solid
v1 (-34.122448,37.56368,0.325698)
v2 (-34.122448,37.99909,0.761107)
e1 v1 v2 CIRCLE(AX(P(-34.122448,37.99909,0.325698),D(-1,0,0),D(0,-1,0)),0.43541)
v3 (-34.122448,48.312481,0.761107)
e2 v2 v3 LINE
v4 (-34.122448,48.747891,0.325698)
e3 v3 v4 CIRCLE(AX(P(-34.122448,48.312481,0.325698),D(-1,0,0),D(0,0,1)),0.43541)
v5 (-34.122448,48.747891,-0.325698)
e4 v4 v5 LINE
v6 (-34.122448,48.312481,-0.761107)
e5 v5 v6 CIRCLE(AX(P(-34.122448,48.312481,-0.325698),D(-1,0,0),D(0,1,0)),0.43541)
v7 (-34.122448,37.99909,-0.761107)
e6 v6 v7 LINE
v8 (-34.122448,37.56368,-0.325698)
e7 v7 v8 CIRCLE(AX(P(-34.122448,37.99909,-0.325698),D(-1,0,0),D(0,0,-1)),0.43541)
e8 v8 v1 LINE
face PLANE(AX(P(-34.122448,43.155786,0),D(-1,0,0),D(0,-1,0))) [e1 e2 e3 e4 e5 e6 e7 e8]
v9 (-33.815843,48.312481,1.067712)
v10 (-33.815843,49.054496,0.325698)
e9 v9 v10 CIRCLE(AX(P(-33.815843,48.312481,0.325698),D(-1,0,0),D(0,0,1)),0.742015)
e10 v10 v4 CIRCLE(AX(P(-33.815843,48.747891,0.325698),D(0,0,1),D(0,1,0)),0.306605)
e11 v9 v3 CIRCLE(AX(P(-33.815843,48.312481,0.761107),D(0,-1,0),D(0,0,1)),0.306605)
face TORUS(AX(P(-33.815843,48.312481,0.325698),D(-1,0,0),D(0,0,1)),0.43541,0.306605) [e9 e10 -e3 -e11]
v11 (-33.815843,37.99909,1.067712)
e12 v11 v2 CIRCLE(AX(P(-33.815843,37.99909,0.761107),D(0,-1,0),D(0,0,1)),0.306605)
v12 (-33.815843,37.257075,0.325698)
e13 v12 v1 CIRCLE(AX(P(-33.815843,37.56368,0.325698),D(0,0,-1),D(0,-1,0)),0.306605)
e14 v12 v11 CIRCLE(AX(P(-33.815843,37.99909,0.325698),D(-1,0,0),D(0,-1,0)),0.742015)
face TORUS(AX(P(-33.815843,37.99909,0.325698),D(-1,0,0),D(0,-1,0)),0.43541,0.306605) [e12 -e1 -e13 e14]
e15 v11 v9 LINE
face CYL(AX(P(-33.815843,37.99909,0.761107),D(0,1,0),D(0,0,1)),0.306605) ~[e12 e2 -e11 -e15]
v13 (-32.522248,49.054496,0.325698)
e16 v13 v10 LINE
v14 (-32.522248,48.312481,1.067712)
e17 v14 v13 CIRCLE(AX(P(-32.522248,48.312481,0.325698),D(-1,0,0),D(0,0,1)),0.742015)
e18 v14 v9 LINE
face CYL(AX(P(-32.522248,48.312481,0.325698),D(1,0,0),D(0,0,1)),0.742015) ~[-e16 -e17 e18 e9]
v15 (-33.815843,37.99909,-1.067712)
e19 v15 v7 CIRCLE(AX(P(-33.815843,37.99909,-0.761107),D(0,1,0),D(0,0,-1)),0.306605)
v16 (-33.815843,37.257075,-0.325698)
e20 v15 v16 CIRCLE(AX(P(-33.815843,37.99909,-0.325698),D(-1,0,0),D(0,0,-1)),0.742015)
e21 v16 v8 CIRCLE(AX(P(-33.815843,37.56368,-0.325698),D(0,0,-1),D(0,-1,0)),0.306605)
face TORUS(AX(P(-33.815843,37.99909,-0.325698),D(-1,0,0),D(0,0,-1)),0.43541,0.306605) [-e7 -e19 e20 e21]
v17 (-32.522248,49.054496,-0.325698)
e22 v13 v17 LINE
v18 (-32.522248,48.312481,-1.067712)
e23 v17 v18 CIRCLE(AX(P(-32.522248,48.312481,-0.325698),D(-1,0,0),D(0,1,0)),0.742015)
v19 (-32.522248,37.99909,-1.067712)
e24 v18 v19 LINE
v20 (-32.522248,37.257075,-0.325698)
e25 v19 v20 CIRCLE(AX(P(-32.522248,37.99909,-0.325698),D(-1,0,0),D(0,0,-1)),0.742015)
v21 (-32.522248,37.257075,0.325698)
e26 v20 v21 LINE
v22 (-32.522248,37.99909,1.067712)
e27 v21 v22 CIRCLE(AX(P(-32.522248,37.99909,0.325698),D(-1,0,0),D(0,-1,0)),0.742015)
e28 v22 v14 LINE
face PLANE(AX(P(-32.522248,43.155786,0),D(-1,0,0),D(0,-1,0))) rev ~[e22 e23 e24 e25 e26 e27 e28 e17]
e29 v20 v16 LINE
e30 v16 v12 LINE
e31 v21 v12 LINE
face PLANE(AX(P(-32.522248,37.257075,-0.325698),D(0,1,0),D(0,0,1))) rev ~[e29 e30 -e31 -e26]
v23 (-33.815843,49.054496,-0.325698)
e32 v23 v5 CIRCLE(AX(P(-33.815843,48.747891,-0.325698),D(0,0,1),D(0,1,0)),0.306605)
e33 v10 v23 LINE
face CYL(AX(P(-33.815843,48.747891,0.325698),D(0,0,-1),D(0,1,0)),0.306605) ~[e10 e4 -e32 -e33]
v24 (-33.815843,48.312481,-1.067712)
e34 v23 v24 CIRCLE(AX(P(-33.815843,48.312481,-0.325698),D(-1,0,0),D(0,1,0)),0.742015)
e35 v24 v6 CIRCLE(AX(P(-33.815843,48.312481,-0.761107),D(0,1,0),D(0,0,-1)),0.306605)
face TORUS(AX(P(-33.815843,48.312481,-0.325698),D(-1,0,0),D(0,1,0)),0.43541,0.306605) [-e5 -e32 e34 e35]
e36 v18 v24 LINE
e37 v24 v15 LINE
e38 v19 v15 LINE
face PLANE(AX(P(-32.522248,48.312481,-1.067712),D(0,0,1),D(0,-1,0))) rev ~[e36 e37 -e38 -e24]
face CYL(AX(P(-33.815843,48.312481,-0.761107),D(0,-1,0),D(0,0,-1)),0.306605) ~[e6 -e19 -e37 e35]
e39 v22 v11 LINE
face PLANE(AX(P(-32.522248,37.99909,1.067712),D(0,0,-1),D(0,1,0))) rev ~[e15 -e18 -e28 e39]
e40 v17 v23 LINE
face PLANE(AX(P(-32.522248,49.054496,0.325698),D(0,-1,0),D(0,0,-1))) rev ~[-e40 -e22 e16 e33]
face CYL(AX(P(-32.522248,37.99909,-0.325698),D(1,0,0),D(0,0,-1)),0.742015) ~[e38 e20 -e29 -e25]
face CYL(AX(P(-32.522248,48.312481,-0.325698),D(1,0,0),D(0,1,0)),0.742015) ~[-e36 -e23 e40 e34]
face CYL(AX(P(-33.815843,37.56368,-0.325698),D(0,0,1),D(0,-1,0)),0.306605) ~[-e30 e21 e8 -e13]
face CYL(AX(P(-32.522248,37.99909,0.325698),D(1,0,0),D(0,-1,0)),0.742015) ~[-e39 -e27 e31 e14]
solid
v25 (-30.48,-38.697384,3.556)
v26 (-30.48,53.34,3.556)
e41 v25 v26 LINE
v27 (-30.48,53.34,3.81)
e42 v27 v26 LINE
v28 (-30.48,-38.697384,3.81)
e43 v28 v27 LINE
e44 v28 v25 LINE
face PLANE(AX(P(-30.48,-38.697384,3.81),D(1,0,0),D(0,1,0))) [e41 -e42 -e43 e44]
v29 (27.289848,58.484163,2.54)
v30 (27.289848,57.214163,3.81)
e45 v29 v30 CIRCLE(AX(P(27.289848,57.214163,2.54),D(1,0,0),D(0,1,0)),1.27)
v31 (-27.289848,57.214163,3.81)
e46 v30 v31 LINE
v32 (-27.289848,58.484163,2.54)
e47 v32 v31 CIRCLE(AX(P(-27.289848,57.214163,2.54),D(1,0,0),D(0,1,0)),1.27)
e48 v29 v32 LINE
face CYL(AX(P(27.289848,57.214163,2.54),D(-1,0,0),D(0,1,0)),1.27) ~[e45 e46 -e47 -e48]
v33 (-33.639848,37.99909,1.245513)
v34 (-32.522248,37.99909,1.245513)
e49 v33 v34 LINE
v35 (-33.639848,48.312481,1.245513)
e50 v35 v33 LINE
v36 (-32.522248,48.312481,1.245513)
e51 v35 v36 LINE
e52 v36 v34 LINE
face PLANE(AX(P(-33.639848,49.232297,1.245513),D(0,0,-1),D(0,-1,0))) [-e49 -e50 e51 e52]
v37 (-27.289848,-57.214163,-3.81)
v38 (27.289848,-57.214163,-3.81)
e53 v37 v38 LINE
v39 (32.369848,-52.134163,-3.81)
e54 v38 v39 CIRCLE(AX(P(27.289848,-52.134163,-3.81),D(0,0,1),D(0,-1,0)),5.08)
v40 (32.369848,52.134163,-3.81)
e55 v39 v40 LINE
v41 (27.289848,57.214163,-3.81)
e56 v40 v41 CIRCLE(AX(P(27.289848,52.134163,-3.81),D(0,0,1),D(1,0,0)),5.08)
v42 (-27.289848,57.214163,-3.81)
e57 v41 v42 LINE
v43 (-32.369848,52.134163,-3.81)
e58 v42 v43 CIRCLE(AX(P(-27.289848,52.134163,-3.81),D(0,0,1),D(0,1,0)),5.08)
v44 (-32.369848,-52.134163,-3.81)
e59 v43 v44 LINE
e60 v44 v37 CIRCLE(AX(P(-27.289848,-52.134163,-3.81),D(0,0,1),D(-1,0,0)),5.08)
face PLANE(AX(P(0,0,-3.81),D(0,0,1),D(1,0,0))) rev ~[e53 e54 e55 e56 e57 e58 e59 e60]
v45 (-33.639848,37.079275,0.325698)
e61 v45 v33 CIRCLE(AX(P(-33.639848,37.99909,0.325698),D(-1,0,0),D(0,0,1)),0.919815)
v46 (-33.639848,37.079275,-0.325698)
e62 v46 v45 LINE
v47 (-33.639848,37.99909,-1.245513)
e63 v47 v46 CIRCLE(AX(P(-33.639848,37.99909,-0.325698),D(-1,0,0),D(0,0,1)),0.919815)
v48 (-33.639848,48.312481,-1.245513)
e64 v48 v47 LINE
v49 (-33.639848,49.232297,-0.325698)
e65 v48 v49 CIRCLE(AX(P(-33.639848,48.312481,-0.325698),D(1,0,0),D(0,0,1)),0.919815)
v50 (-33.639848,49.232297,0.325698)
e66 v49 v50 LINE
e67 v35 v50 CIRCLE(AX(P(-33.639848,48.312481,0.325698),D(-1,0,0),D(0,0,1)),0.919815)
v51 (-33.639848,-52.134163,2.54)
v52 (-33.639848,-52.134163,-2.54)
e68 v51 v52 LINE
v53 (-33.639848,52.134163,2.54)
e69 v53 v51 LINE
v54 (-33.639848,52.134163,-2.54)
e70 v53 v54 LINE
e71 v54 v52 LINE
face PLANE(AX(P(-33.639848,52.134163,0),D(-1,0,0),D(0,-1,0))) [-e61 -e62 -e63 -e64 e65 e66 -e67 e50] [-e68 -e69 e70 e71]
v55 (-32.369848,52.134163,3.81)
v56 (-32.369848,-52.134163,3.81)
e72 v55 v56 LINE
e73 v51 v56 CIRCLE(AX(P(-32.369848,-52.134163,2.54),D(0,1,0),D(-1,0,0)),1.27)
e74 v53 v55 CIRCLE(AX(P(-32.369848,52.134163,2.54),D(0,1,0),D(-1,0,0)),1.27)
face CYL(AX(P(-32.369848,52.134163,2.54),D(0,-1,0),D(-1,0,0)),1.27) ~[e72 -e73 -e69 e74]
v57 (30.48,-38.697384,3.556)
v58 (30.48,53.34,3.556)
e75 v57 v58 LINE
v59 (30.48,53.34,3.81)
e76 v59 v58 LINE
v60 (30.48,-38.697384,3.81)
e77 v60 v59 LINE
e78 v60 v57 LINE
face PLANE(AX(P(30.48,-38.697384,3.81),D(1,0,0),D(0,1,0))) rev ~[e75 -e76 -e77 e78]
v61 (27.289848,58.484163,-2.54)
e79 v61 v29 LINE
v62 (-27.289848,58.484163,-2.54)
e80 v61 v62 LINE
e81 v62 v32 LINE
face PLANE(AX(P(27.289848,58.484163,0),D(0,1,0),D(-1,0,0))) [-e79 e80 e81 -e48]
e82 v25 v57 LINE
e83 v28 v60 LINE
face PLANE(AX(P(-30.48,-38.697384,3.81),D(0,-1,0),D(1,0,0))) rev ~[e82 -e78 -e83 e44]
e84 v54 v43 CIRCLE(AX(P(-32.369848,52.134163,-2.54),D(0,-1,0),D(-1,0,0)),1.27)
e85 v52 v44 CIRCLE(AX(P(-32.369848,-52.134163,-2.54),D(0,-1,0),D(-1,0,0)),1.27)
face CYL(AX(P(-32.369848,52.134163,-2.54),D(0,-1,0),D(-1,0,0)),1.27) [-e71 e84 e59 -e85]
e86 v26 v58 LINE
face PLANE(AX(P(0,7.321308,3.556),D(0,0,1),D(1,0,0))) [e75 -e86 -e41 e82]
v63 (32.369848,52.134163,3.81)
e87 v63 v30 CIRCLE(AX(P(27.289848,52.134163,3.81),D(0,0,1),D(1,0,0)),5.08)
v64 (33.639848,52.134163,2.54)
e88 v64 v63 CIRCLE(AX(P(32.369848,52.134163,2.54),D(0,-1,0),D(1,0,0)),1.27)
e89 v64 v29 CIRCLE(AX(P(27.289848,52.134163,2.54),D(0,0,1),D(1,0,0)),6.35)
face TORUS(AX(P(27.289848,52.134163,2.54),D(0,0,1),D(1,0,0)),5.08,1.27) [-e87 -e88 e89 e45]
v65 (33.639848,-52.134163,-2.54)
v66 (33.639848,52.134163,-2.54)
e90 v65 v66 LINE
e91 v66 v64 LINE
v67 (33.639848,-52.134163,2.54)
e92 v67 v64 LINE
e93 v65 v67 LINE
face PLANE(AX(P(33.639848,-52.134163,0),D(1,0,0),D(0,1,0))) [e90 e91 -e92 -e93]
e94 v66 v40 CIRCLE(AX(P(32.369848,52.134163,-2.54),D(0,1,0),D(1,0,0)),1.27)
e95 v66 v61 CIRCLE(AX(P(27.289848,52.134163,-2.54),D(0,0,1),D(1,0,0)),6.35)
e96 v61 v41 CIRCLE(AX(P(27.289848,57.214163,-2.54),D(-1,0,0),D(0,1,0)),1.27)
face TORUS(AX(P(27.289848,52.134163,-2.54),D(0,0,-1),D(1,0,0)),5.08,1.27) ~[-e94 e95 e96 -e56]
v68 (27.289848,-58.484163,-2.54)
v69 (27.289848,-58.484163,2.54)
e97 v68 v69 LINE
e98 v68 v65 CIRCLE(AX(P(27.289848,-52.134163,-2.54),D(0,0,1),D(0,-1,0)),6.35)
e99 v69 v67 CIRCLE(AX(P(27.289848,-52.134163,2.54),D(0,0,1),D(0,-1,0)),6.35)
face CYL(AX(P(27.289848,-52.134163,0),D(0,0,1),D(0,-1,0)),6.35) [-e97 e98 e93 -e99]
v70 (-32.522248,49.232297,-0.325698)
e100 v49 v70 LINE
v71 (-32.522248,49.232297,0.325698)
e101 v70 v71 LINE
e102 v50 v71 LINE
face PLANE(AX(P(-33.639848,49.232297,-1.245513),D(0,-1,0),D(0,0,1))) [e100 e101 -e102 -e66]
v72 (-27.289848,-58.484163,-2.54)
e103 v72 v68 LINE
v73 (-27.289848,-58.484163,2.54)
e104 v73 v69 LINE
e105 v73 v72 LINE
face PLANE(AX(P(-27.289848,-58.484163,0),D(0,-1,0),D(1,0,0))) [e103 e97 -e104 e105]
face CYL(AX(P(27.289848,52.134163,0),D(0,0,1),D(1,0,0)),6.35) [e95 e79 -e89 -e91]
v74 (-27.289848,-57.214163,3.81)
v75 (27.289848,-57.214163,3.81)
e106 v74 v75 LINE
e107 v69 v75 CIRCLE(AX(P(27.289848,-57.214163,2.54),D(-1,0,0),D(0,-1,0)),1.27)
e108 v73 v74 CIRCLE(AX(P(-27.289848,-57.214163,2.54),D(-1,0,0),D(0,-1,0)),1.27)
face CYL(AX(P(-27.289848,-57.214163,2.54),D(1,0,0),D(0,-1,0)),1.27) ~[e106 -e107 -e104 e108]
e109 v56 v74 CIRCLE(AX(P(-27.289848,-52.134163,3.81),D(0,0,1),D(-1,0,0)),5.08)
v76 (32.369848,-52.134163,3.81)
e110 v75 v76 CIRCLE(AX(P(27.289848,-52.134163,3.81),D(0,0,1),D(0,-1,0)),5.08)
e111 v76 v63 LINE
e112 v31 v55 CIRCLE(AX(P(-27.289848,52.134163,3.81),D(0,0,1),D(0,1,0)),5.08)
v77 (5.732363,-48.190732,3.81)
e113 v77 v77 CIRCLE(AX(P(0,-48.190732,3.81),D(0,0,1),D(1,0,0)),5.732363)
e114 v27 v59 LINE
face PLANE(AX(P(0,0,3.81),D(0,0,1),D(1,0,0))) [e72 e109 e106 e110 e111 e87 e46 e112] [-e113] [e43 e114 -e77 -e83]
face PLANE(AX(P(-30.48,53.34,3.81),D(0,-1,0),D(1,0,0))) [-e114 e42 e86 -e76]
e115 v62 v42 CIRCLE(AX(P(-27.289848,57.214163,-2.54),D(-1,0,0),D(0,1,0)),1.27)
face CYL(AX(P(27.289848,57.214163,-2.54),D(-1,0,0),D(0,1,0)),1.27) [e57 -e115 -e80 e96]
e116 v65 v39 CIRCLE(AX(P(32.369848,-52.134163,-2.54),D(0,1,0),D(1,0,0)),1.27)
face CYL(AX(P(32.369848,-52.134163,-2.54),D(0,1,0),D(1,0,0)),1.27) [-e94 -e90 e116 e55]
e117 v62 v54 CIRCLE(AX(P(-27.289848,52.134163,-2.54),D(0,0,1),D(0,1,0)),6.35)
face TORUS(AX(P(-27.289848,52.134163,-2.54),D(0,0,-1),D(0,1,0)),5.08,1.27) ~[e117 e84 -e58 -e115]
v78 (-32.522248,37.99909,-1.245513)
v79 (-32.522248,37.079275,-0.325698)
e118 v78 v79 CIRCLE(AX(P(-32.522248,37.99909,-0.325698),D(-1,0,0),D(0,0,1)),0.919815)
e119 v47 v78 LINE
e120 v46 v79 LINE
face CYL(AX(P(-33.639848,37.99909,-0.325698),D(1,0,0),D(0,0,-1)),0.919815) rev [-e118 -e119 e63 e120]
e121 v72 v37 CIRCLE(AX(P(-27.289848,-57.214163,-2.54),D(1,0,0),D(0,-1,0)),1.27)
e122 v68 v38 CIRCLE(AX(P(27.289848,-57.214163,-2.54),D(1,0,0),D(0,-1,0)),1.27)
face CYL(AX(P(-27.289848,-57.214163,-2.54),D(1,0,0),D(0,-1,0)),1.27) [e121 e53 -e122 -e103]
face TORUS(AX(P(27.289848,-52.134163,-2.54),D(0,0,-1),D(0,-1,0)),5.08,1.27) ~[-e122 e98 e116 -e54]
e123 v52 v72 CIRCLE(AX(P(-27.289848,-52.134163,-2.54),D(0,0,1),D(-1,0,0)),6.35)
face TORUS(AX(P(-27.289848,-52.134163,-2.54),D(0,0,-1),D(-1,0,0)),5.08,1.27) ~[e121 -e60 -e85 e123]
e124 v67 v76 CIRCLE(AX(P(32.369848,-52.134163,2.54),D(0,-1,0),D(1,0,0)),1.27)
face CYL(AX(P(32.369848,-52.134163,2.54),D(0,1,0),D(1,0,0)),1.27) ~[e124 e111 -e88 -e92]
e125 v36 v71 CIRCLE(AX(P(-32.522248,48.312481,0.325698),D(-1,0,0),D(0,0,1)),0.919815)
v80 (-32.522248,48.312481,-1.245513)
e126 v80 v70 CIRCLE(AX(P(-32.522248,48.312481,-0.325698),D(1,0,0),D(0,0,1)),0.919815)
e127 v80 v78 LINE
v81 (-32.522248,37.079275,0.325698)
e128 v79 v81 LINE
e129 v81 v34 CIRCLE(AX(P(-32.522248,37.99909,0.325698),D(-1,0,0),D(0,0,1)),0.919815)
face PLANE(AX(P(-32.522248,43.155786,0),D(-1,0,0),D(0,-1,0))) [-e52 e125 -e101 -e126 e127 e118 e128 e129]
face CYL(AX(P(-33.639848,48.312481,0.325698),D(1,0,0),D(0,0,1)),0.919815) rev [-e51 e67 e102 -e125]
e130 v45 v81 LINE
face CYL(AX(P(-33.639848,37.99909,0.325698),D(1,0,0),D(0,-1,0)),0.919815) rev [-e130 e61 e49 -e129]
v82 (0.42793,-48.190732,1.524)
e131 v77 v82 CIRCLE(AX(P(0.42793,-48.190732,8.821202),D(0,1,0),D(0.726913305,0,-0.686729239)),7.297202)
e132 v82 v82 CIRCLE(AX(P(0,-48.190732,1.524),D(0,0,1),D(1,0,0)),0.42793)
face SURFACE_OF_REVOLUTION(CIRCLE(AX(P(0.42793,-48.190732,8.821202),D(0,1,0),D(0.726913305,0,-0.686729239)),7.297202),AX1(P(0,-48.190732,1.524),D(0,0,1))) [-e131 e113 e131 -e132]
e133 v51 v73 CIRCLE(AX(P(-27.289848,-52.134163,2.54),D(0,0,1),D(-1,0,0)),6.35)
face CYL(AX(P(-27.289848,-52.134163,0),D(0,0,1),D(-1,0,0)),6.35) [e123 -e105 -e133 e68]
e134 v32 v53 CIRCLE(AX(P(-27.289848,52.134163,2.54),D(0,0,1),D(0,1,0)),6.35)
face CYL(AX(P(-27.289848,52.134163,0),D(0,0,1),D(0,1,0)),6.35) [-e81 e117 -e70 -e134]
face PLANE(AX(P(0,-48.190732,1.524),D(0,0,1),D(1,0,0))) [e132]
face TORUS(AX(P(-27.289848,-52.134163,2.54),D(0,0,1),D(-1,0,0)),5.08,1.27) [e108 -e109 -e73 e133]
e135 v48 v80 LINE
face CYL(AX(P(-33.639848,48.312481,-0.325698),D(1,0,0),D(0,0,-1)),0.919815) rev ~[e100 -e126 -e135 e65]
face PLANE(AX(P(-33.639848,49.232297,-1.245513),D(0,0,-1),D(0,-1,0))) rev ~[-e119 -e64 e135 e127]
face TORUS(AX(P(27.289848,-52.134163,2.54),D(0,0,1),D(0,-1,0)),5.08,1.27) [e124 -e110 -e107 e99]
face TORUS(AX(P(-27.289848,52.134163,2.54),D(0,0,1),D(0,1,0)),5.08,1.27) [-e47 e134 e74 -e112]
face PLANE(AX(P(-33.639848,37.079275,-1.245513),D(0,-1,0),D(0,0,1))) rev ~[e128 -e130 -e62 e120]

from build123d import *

# Parameters (mm, degrees)
F1_DEPTH  = 3.81
F2_R      = 1.27
F3_R      = 5.7323628205
F4_DEPTH  = 2.286
F3_W      = 60.96
F3_H      = 92.0373842978
F6_DEPTH  = 0.254
F7_W      = 12.1530219913
F7_H      = 2.4910259526
F8_DEPTH  = 1.1176
F9_R      = 0.9198153673
F11_DEPTH = 1.6002
F12_R     = 0.3066051224


# Not quite as in the source:
# - a fillet or chamfer that OpenCascade refuses, or shapes differently, is made with other operations: its cross-section is extruded or revolved along the edge and cut away or added


with BuildPart() as f1:
    # F0 (on Top) → F1 (new body, symmetric)
    with BuildSketch(Plane.XY):
        with BuildLine():
            Line((-27.2898482323, -58.4841631353), (27.2898482323, -58.4841631353))
            ThreePointArc((27.2898482323, -58.4841631353), (31.7799762928, -56.6242911958), (33.6398482323, -52.1341631353))
            Line((33.6398482323, -52.1341631353), (33.6398482323, 52.1341631353))
            ThreePointArc((33.6398482323, 52.1341631353), (31.7799762928, 56.6242911958), (27.2898482323, 58.4841631353))
            Line((27.2898482323, 58.4841631353), (-27.2898482323, 58.4841631353))
            ThreePointArc((-27.2898482323, 58.4841631353), (-31.7799762928, 56.6242911958), (-33.6398482323, 52.1341631353))
            Line((-33.6398482323, 52.1341631353), (-33.6398482323, -52.1341631353))
            ThreePointArc((-33.6398482323, -52.1341631353), (-31.7799762928, -56.6242911958), (-27.2898482323, -58.4841631353))
        make_face()
    extrude(amount=F1_DEPTH, both=True)

    # F2
    f2_edges = [f1.edges().sort_by_distance(p)[0] for p in [
        (33.639848, 0, 3.81),
        (33.639848, 0, -3.81),
        (-33.639848, 0, -3.81),
        (-33.639848, 0, 3.81),
        (-31.779976, 56.624291, -3.81),
        (-31.779976, 56.624291, 3.81),
        (0, 58.484163, -3.81),
        (0, 58.484163, 3.81),
        (31.779976, 56.624291, -3.81),
        (31.779976, 56.624291, 3.81),
        (31.779976, -56.624291, -3.81),
        (31.779976, -56.624291, 3.81),
        (0, -58.484163, -3.81),
        (0, -58.484163, 3.81),
        (-31.779976, -56.624291, 3.81),
        (-31.779976, -56.624291, -3.81),
    ]]
    fillet(f2_edges, radius=F2_R)

    # F3 (on face) → F4 (cut)
    with BuildSketch(Plane.XY.offset(3.81)):
        with Locations((0, -48.1907315552)):
            Circle(F3_R)
    extrude(amount=-F4_DEPTH, mode=Mode.SUBTRACT)

    # F5: fillet of radius 7.2972019136 on 1 edges, made by hand

    # F5_s1 → F5_t2 (revolve)
    with BuildSketch(Plane.XZ.offset(48.1907315552)):
        with BuildLine():
            ThreePointArc((5.7323628205, 3.81), (3.3159569781, 2.1198248924), (0.4279296605, 1.524))
            Line((0.4279296605, 1.524), (5.7323628205, 1.524))
            Line((5.7323628205, 1.524), (5.7323628205, 3.81))
        make_face()
    revolve(axis=Axis((0, -48.1907315552, 1.524), (0, 0, 1)))

    # F3 (on face) → F6 (cut)
    with BuildSketch(Plane.XY.offset(3.81)):
        with Locations((0, 7.3213078511)):
            Rectangle(F3_W, F3_H)
    extrude(amount=-F6_DEPTH, mode=Mode.SUBTRACT)

    # F7 (on face) → F8 (cut)
    with BuildSketch(Plane(origin=(-33.6398482323, 0, 0), x_dir=(0, -1, 0), z_dir=(-1, 0, 0))):
        with Locations((-43.15578565, 0)):
            Rectangle(F7_W, F7_H)
    extrude(amount=-F8_DEPTH, mode=Mode.SUBTRACT)

    # F9
    f9_edges = [f1.edges().sort_by_distance(p)[0] for p in [
        (-33.081048, 37.079275, 1.245513),
        (-33.081048, 49.232297, 1.245513),
        (-33.081048, 49.232297, -1.245513),
        (-33.081048, 37.079275, -1.245513),
    ]]
    fillet(f9_edges, radius=F9_R)


with BuildPart() as f11:
    # F10 (on face) → F11 (new body)
    with BuildSketch(Plane(origin=(-32.5222482323, 0, 0), x_dir=(0, -1, 0), z_dir=(-1, 0, 0))):
        with BuildLine():
            Line((-48.3124812784, -1.0677123209), (-37.9990900217, -1.0677123209))
            ThreePointArc((-37.9990900217, -1.0677123209), (-37.4744063871, -0.8503812436), (-37.2570753098, -0.325697609))
            Line((-37.2570753098, -0.325697609), (-37.2570753098, 0.325697609))
            ThreePointArc((-37.2570753098, 0.325697609), (-37.4744063871, 0.8503812436), (-37.9990900217, 1.0677123209))
            Line((-37.9990900217, 1.0677123209), (-48.3124812784, 1.0677123209))
            ThreePointArc((-48.3124812784, 1.0677123209), (-48.8371649129, 0.8503812436), (-49.0544959903, 0.325697609))
            Line((-49.0544959903, 0.325697609), (-49.0544959903, -0.325697609))
            ThreePointArc((-49.0544959903, -0.325697609), (-48.8371649129, -0.8503812436), (-48.3124812784, -1.0677123209))
        make_face()
    extrude(amount=F11_DEPTH)

    # F12
    f12_edges = [f11.edges().sort_by_distance(p)[0] for p in [
        (-34.122448, 37.474406, -0.850381),
        (-34.122448, 37.257075, 0),
        (-34.122448, 37.474406, 0.850381),
        (-34.122448, 43.155786, 1.067712),
        (-34.122448, 48.837165, 0.850381),
        (-34.122448, 49.054496, 0),
        (-34.122448, 48.837165, -0.850381),
        (-34.122448, 43.155786, -1.067712),
    ]]
    fillet(f12_edges, radius=F12_R)


solid = Compound([f1.part, f11.part])
